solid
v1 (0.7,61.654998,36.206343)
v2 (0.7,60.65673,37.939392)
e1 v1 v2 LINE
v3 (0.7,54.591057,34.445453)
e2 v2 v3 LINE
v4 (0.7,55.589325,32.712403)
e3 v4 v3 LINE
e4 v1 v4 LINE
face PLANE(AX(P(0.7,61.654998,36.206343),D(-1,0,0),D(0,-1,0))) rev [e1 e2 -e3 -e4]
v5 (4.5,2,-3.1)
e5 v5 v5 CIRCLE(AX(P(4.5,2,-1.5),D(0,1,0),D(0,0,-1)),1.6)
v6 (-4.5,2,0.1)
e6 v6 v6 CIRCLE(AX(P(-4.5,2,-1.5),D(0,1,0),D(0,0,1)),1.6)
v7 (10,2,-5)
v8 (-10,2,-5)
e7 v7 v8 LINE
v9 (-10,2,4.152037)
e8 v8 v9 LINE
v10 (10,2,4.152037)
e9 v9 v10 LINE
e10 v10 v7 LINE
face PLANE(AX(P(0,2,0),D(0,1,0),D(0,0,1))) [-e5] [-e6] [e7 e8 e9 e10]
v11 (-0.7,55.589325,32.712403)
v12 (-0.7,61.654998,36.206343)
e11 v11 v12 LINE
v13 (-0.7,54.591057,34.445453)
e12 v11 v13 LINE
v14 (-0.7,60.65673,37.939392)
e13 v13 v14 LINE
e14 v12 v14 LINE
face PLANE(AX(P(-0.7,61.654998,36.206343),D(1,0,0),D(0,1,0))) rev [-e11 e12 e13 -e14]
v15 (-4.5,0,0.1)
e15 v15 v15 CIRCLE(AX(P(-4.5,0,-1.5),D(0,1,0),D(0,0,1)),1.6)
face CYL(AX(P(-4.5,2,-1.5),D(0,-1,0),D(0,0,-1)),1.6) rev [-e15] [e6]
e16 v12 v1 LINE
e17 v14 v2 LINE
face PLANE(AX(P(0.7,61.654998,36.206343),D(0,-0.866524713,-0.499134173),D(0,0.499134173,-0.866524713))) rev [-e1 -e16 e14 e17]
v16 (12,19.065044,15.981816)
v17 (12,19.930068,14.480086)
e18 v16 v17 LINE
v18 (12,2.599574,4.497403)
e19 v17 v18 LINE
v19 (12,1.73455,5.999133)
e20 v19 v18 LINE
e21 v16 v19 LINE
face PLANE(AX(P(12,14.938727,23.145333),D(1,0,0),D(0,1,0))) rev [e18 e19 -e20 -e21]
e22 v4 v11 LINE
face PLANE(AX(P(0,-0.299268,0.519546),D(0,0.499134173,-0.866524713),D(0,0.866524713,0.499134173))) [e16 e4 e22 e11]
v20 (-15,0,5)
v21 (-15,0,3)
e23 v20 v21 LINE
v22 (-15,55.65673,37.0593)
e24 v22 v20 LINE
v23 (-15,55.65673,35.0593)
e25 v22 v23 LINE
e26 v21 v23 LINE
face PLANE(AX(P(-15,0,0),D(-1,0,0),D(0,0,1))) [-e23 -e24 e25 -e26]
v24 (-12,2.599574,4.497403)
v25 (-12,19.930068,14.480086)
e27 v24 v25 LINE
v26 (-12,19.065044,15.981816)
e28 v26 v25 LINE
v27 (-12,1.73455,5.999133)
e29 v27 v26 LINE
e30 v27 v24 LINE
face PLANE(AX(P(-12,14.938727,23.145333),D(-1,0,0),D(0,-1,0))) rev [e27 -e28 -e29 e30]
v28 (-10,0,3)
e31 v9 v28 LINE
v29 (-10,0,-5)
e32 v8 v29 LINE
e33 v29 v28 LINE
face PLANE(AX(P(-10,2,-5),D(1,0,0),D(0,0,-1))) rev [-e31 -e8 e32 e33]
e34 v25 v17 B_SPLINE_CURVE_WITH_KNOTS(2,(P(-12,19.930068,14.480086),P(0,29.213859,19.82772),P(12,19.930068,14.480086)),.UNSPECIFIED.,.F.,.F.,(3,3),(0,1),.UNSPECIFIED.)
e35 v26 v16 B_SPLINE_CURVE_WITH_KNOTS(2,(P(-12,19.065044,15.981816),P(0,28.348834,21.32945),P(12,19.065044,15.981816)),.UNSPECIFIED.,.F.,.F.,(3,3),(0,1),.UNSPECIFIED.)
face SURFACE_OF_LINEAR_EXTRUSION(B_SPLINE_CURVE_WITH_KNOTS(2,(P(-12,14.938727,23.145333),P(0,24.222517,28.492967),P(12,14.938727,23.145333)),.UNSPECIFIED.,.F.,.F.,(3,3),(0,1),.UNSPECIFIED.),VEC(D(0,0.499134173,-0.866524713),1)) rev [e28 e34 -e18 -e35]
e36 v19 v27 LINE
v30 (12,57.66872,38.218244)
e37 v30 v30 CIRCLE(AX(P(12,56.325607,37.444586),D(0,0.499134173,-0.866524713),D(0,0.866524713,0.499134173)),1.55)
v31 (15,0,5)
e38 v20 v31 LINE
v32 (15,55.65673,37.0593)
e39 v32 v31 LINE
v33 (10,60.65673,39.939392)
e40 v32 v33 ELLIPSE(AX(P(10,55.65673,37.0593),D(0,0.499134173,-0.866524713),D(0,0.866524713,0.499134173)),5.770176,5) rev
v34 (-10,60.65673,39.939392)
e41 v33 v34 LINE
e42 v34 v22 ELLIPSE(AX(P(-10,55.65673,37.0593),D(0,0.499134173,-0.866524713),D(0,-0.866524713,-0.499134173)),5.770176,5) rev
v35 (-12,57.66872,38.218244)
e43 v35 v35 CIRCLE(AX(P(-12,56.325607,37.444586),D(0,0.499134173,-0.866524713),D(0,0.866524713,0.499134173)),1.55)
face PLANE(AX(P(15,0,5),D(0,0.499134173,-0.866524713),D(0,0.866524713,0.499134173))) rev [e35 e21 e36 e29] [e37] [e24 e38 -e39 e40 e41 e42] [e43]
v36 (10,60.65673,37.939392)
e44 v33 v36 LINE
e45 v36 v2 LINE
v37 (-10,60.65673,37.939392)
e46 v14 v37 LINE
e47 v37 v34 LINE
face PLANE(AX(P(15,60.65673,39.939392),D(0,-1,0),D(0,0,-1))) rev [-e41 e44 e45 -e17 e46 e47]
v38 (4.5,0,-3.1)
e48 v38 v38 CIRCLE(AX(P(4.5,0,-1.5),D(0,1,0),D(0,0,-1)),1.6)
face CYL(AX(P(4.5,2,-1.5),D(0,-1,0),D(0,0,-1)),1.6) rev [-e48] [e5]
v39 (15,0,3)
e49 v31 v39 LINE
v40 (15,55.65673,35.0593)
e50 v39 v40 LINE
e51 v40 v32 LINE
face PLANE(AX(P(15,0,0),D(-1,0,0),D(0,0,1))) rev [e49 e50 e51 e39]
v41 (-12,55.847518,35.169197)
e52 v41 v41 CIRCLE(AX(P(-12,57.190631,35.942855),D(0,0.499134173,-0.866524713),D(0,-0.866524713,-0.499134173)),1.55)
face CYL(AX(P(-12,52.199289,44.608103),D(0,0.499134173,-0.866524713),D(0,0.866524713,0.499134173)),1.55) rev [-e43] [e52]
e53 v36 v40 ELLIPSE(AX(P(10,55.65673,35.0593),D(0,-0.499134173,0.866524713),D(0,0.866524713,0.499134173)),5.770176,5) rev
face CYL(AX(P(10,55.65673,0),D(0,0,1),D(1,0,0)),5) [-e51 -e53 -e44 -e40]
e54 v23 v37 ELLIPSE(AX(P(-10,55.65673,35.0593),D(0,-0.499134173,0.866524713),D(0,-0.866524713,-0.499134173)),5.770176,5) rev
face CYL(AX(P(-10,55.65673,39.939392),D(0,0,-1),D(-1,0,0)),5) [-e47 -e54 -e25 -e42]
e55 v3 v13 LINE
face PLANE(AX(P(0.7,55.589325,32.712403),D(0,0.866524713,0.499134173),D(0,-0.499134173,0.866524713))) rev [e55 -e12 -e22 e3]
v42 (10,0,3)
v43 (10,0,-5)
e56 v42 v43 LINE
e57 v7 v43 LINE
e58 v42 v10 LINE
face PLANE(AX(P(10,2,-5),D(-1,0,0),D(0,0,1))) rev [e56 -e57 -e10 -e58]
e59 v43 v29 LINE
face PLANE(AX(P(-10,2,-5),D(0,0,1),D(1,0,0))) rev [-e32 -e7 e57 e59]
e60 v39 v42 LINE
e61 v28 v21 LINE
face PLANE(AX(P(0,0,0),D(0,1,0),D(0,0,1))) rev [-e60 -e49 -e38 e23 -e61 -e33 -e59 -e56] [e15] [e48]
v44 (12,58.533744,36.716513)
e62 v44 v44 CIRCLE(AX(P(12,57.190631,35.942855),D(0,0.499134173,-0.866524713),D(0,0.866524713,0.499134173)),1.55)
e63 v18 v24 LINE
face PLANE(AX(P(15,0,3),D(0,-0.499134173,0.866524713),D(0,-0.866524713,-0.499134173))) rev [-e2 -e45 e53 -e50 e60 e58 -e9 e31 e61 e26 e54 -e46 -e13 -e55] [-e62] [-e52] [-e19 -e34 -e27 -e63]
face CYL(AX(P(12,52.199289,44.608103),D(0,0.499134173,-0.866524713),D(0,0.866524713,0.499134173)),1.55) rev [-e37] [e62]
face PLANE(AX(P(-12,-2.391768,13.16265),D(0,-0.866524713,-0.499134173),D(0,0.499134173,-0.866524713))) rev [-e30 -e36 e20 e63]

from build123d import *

# Parameters (mm, degrees)
SKETCH_1_W           = 20
SKETCH_1_H           = 10
SKETCH_1_R           = 1.6
EXTRUDE_1_DEPTH      = 2
EXTRUDE_2_DEPTH      = 5
EXTRUDE_2_DEPTH_BACK = 25
FILLET_1_R           = 5
SKETCH_3_R           = 1.55
CUT_EXTRUDE_1_DEPTH  = 10
SKETCH_4_W           = 1.4
SKETCH_4_H           = 7
EXTRUDE_3_DEPTH      = 2


with BuildPart() as part:
    # 草图1 → 凸台-拉伸1 (new body)
    with BuildSketch(Plane(origin=(0, 0, 0), x_dir=(1, 0, 0), z_dir=(0, 1, 0))):
        Rectangle(SKETCH_1_W, SKETCH_1_H)
        with Locations(Location((-4.5, 1.5, 0), (0, 0, 270))):
            Circle(SKETCH_1_R, mode=Mode.SUBTRACT)
        with Locations(Location((4.5, 1.5, 0), (0, 0, 90))):
            Circle(SKETCH_1_R, mode=Mode.SUBTRACT)
    extrude(amount=EXTRUDE_1_DEPTH)

    # 草图2 → 凸台-拉伸2 (add, two sides: drawn at the far end of the back side and taken through both)
    with BuildSketch(Plane(origin=(10, 0, 0), x_dir=(0, 0, -1), z_dir=(1, 0, 0)).offset(-EXTRUDE_2_DEPTH_BACK)):
        Polygon((-5, 0), (-3, 0), (-37.93939209, 60.656729885), (-39.93939209, 60.656729885), align=None)
    extrude(amount=EXTRUDE_2_DEPTH + EXTRUDE_2_DEPTH_BACK)

    # 圆角1
    # the kernel refuses this fillet: 5 mm, written as the material it takes off along each edge
    with BuildSketch(Plane(origin=(-15, 60.656729885, 25.43939209), x_dir=(1, 0, 0), z_dir=(0, 0, 1)), Plane(origin=(15, 60.656729885, 25.43939209), x_dir=(0, -1, 0), z_dir=(0, 0, 1))) as fillet_1_piece_1:
        with BuildLine():
            CenterArc((FILLET_1_R, -FILLET_1_R), FILLET_1_R, 90, 90)
            Line((0, -FILLET_1_R), (0, 0))
            Line((0, 0), (FILLET_1_R, 0))
        make_face()
    extrude(amount=27, mode=Mode.SUBTRACT)

    # 草图3 → 切除-拉伸1 (cut)
    with BuildSketch(Plane(origin=(0, -1.297536287, 2.252595233), x_dir=(-1, 0, 0), z_dir=(0, 0.4991341727193529, -0.8665247126445773))):
        with Locations(Location((-12, 67.497402518, 0), (0, 0, 90))):
            Circle(SKETCH_3_R)
        with Locations(Location((12, 67.497402518, 0), (0, 0, 90))):
            Circle(SKETCH_3_R)
        with BuildLine():
            Line((12, 24.497402518), (12, 4.497402518))
            Line((12, 4.497402518), (-12, 4.497402518))
            Line((-12, 4.497402518), (-12, 24.497402518))
            add(Edge.make_bspline(
                [(-12, 24.497402518), (0, 35.211223002), (12, 24.497402518)],
                knots=[0, 0, 0, 1, 1, 1], degree=2))
        make_face()
    extrude(amount=-CUT_EXTRUDE_1_DEPTH, mode=Mode.SUBTRACT)

    # 草图4 → 凸台-拉伸3 (add)
    with BuildSketch(Plane(origin=(0, -1.297536287, 2.252595233), x_dir=(-1, 0, 0), z_dir=(0, 0.4991341727193529, -0.8665247126445773))):
        with Locations((0, 67.997402518)):
            Rectangle(SKETCH_4_W, SKETCH_4_H)
    extrude(amount=EXTRUDE_3_DEPTH)


solid = part.part
